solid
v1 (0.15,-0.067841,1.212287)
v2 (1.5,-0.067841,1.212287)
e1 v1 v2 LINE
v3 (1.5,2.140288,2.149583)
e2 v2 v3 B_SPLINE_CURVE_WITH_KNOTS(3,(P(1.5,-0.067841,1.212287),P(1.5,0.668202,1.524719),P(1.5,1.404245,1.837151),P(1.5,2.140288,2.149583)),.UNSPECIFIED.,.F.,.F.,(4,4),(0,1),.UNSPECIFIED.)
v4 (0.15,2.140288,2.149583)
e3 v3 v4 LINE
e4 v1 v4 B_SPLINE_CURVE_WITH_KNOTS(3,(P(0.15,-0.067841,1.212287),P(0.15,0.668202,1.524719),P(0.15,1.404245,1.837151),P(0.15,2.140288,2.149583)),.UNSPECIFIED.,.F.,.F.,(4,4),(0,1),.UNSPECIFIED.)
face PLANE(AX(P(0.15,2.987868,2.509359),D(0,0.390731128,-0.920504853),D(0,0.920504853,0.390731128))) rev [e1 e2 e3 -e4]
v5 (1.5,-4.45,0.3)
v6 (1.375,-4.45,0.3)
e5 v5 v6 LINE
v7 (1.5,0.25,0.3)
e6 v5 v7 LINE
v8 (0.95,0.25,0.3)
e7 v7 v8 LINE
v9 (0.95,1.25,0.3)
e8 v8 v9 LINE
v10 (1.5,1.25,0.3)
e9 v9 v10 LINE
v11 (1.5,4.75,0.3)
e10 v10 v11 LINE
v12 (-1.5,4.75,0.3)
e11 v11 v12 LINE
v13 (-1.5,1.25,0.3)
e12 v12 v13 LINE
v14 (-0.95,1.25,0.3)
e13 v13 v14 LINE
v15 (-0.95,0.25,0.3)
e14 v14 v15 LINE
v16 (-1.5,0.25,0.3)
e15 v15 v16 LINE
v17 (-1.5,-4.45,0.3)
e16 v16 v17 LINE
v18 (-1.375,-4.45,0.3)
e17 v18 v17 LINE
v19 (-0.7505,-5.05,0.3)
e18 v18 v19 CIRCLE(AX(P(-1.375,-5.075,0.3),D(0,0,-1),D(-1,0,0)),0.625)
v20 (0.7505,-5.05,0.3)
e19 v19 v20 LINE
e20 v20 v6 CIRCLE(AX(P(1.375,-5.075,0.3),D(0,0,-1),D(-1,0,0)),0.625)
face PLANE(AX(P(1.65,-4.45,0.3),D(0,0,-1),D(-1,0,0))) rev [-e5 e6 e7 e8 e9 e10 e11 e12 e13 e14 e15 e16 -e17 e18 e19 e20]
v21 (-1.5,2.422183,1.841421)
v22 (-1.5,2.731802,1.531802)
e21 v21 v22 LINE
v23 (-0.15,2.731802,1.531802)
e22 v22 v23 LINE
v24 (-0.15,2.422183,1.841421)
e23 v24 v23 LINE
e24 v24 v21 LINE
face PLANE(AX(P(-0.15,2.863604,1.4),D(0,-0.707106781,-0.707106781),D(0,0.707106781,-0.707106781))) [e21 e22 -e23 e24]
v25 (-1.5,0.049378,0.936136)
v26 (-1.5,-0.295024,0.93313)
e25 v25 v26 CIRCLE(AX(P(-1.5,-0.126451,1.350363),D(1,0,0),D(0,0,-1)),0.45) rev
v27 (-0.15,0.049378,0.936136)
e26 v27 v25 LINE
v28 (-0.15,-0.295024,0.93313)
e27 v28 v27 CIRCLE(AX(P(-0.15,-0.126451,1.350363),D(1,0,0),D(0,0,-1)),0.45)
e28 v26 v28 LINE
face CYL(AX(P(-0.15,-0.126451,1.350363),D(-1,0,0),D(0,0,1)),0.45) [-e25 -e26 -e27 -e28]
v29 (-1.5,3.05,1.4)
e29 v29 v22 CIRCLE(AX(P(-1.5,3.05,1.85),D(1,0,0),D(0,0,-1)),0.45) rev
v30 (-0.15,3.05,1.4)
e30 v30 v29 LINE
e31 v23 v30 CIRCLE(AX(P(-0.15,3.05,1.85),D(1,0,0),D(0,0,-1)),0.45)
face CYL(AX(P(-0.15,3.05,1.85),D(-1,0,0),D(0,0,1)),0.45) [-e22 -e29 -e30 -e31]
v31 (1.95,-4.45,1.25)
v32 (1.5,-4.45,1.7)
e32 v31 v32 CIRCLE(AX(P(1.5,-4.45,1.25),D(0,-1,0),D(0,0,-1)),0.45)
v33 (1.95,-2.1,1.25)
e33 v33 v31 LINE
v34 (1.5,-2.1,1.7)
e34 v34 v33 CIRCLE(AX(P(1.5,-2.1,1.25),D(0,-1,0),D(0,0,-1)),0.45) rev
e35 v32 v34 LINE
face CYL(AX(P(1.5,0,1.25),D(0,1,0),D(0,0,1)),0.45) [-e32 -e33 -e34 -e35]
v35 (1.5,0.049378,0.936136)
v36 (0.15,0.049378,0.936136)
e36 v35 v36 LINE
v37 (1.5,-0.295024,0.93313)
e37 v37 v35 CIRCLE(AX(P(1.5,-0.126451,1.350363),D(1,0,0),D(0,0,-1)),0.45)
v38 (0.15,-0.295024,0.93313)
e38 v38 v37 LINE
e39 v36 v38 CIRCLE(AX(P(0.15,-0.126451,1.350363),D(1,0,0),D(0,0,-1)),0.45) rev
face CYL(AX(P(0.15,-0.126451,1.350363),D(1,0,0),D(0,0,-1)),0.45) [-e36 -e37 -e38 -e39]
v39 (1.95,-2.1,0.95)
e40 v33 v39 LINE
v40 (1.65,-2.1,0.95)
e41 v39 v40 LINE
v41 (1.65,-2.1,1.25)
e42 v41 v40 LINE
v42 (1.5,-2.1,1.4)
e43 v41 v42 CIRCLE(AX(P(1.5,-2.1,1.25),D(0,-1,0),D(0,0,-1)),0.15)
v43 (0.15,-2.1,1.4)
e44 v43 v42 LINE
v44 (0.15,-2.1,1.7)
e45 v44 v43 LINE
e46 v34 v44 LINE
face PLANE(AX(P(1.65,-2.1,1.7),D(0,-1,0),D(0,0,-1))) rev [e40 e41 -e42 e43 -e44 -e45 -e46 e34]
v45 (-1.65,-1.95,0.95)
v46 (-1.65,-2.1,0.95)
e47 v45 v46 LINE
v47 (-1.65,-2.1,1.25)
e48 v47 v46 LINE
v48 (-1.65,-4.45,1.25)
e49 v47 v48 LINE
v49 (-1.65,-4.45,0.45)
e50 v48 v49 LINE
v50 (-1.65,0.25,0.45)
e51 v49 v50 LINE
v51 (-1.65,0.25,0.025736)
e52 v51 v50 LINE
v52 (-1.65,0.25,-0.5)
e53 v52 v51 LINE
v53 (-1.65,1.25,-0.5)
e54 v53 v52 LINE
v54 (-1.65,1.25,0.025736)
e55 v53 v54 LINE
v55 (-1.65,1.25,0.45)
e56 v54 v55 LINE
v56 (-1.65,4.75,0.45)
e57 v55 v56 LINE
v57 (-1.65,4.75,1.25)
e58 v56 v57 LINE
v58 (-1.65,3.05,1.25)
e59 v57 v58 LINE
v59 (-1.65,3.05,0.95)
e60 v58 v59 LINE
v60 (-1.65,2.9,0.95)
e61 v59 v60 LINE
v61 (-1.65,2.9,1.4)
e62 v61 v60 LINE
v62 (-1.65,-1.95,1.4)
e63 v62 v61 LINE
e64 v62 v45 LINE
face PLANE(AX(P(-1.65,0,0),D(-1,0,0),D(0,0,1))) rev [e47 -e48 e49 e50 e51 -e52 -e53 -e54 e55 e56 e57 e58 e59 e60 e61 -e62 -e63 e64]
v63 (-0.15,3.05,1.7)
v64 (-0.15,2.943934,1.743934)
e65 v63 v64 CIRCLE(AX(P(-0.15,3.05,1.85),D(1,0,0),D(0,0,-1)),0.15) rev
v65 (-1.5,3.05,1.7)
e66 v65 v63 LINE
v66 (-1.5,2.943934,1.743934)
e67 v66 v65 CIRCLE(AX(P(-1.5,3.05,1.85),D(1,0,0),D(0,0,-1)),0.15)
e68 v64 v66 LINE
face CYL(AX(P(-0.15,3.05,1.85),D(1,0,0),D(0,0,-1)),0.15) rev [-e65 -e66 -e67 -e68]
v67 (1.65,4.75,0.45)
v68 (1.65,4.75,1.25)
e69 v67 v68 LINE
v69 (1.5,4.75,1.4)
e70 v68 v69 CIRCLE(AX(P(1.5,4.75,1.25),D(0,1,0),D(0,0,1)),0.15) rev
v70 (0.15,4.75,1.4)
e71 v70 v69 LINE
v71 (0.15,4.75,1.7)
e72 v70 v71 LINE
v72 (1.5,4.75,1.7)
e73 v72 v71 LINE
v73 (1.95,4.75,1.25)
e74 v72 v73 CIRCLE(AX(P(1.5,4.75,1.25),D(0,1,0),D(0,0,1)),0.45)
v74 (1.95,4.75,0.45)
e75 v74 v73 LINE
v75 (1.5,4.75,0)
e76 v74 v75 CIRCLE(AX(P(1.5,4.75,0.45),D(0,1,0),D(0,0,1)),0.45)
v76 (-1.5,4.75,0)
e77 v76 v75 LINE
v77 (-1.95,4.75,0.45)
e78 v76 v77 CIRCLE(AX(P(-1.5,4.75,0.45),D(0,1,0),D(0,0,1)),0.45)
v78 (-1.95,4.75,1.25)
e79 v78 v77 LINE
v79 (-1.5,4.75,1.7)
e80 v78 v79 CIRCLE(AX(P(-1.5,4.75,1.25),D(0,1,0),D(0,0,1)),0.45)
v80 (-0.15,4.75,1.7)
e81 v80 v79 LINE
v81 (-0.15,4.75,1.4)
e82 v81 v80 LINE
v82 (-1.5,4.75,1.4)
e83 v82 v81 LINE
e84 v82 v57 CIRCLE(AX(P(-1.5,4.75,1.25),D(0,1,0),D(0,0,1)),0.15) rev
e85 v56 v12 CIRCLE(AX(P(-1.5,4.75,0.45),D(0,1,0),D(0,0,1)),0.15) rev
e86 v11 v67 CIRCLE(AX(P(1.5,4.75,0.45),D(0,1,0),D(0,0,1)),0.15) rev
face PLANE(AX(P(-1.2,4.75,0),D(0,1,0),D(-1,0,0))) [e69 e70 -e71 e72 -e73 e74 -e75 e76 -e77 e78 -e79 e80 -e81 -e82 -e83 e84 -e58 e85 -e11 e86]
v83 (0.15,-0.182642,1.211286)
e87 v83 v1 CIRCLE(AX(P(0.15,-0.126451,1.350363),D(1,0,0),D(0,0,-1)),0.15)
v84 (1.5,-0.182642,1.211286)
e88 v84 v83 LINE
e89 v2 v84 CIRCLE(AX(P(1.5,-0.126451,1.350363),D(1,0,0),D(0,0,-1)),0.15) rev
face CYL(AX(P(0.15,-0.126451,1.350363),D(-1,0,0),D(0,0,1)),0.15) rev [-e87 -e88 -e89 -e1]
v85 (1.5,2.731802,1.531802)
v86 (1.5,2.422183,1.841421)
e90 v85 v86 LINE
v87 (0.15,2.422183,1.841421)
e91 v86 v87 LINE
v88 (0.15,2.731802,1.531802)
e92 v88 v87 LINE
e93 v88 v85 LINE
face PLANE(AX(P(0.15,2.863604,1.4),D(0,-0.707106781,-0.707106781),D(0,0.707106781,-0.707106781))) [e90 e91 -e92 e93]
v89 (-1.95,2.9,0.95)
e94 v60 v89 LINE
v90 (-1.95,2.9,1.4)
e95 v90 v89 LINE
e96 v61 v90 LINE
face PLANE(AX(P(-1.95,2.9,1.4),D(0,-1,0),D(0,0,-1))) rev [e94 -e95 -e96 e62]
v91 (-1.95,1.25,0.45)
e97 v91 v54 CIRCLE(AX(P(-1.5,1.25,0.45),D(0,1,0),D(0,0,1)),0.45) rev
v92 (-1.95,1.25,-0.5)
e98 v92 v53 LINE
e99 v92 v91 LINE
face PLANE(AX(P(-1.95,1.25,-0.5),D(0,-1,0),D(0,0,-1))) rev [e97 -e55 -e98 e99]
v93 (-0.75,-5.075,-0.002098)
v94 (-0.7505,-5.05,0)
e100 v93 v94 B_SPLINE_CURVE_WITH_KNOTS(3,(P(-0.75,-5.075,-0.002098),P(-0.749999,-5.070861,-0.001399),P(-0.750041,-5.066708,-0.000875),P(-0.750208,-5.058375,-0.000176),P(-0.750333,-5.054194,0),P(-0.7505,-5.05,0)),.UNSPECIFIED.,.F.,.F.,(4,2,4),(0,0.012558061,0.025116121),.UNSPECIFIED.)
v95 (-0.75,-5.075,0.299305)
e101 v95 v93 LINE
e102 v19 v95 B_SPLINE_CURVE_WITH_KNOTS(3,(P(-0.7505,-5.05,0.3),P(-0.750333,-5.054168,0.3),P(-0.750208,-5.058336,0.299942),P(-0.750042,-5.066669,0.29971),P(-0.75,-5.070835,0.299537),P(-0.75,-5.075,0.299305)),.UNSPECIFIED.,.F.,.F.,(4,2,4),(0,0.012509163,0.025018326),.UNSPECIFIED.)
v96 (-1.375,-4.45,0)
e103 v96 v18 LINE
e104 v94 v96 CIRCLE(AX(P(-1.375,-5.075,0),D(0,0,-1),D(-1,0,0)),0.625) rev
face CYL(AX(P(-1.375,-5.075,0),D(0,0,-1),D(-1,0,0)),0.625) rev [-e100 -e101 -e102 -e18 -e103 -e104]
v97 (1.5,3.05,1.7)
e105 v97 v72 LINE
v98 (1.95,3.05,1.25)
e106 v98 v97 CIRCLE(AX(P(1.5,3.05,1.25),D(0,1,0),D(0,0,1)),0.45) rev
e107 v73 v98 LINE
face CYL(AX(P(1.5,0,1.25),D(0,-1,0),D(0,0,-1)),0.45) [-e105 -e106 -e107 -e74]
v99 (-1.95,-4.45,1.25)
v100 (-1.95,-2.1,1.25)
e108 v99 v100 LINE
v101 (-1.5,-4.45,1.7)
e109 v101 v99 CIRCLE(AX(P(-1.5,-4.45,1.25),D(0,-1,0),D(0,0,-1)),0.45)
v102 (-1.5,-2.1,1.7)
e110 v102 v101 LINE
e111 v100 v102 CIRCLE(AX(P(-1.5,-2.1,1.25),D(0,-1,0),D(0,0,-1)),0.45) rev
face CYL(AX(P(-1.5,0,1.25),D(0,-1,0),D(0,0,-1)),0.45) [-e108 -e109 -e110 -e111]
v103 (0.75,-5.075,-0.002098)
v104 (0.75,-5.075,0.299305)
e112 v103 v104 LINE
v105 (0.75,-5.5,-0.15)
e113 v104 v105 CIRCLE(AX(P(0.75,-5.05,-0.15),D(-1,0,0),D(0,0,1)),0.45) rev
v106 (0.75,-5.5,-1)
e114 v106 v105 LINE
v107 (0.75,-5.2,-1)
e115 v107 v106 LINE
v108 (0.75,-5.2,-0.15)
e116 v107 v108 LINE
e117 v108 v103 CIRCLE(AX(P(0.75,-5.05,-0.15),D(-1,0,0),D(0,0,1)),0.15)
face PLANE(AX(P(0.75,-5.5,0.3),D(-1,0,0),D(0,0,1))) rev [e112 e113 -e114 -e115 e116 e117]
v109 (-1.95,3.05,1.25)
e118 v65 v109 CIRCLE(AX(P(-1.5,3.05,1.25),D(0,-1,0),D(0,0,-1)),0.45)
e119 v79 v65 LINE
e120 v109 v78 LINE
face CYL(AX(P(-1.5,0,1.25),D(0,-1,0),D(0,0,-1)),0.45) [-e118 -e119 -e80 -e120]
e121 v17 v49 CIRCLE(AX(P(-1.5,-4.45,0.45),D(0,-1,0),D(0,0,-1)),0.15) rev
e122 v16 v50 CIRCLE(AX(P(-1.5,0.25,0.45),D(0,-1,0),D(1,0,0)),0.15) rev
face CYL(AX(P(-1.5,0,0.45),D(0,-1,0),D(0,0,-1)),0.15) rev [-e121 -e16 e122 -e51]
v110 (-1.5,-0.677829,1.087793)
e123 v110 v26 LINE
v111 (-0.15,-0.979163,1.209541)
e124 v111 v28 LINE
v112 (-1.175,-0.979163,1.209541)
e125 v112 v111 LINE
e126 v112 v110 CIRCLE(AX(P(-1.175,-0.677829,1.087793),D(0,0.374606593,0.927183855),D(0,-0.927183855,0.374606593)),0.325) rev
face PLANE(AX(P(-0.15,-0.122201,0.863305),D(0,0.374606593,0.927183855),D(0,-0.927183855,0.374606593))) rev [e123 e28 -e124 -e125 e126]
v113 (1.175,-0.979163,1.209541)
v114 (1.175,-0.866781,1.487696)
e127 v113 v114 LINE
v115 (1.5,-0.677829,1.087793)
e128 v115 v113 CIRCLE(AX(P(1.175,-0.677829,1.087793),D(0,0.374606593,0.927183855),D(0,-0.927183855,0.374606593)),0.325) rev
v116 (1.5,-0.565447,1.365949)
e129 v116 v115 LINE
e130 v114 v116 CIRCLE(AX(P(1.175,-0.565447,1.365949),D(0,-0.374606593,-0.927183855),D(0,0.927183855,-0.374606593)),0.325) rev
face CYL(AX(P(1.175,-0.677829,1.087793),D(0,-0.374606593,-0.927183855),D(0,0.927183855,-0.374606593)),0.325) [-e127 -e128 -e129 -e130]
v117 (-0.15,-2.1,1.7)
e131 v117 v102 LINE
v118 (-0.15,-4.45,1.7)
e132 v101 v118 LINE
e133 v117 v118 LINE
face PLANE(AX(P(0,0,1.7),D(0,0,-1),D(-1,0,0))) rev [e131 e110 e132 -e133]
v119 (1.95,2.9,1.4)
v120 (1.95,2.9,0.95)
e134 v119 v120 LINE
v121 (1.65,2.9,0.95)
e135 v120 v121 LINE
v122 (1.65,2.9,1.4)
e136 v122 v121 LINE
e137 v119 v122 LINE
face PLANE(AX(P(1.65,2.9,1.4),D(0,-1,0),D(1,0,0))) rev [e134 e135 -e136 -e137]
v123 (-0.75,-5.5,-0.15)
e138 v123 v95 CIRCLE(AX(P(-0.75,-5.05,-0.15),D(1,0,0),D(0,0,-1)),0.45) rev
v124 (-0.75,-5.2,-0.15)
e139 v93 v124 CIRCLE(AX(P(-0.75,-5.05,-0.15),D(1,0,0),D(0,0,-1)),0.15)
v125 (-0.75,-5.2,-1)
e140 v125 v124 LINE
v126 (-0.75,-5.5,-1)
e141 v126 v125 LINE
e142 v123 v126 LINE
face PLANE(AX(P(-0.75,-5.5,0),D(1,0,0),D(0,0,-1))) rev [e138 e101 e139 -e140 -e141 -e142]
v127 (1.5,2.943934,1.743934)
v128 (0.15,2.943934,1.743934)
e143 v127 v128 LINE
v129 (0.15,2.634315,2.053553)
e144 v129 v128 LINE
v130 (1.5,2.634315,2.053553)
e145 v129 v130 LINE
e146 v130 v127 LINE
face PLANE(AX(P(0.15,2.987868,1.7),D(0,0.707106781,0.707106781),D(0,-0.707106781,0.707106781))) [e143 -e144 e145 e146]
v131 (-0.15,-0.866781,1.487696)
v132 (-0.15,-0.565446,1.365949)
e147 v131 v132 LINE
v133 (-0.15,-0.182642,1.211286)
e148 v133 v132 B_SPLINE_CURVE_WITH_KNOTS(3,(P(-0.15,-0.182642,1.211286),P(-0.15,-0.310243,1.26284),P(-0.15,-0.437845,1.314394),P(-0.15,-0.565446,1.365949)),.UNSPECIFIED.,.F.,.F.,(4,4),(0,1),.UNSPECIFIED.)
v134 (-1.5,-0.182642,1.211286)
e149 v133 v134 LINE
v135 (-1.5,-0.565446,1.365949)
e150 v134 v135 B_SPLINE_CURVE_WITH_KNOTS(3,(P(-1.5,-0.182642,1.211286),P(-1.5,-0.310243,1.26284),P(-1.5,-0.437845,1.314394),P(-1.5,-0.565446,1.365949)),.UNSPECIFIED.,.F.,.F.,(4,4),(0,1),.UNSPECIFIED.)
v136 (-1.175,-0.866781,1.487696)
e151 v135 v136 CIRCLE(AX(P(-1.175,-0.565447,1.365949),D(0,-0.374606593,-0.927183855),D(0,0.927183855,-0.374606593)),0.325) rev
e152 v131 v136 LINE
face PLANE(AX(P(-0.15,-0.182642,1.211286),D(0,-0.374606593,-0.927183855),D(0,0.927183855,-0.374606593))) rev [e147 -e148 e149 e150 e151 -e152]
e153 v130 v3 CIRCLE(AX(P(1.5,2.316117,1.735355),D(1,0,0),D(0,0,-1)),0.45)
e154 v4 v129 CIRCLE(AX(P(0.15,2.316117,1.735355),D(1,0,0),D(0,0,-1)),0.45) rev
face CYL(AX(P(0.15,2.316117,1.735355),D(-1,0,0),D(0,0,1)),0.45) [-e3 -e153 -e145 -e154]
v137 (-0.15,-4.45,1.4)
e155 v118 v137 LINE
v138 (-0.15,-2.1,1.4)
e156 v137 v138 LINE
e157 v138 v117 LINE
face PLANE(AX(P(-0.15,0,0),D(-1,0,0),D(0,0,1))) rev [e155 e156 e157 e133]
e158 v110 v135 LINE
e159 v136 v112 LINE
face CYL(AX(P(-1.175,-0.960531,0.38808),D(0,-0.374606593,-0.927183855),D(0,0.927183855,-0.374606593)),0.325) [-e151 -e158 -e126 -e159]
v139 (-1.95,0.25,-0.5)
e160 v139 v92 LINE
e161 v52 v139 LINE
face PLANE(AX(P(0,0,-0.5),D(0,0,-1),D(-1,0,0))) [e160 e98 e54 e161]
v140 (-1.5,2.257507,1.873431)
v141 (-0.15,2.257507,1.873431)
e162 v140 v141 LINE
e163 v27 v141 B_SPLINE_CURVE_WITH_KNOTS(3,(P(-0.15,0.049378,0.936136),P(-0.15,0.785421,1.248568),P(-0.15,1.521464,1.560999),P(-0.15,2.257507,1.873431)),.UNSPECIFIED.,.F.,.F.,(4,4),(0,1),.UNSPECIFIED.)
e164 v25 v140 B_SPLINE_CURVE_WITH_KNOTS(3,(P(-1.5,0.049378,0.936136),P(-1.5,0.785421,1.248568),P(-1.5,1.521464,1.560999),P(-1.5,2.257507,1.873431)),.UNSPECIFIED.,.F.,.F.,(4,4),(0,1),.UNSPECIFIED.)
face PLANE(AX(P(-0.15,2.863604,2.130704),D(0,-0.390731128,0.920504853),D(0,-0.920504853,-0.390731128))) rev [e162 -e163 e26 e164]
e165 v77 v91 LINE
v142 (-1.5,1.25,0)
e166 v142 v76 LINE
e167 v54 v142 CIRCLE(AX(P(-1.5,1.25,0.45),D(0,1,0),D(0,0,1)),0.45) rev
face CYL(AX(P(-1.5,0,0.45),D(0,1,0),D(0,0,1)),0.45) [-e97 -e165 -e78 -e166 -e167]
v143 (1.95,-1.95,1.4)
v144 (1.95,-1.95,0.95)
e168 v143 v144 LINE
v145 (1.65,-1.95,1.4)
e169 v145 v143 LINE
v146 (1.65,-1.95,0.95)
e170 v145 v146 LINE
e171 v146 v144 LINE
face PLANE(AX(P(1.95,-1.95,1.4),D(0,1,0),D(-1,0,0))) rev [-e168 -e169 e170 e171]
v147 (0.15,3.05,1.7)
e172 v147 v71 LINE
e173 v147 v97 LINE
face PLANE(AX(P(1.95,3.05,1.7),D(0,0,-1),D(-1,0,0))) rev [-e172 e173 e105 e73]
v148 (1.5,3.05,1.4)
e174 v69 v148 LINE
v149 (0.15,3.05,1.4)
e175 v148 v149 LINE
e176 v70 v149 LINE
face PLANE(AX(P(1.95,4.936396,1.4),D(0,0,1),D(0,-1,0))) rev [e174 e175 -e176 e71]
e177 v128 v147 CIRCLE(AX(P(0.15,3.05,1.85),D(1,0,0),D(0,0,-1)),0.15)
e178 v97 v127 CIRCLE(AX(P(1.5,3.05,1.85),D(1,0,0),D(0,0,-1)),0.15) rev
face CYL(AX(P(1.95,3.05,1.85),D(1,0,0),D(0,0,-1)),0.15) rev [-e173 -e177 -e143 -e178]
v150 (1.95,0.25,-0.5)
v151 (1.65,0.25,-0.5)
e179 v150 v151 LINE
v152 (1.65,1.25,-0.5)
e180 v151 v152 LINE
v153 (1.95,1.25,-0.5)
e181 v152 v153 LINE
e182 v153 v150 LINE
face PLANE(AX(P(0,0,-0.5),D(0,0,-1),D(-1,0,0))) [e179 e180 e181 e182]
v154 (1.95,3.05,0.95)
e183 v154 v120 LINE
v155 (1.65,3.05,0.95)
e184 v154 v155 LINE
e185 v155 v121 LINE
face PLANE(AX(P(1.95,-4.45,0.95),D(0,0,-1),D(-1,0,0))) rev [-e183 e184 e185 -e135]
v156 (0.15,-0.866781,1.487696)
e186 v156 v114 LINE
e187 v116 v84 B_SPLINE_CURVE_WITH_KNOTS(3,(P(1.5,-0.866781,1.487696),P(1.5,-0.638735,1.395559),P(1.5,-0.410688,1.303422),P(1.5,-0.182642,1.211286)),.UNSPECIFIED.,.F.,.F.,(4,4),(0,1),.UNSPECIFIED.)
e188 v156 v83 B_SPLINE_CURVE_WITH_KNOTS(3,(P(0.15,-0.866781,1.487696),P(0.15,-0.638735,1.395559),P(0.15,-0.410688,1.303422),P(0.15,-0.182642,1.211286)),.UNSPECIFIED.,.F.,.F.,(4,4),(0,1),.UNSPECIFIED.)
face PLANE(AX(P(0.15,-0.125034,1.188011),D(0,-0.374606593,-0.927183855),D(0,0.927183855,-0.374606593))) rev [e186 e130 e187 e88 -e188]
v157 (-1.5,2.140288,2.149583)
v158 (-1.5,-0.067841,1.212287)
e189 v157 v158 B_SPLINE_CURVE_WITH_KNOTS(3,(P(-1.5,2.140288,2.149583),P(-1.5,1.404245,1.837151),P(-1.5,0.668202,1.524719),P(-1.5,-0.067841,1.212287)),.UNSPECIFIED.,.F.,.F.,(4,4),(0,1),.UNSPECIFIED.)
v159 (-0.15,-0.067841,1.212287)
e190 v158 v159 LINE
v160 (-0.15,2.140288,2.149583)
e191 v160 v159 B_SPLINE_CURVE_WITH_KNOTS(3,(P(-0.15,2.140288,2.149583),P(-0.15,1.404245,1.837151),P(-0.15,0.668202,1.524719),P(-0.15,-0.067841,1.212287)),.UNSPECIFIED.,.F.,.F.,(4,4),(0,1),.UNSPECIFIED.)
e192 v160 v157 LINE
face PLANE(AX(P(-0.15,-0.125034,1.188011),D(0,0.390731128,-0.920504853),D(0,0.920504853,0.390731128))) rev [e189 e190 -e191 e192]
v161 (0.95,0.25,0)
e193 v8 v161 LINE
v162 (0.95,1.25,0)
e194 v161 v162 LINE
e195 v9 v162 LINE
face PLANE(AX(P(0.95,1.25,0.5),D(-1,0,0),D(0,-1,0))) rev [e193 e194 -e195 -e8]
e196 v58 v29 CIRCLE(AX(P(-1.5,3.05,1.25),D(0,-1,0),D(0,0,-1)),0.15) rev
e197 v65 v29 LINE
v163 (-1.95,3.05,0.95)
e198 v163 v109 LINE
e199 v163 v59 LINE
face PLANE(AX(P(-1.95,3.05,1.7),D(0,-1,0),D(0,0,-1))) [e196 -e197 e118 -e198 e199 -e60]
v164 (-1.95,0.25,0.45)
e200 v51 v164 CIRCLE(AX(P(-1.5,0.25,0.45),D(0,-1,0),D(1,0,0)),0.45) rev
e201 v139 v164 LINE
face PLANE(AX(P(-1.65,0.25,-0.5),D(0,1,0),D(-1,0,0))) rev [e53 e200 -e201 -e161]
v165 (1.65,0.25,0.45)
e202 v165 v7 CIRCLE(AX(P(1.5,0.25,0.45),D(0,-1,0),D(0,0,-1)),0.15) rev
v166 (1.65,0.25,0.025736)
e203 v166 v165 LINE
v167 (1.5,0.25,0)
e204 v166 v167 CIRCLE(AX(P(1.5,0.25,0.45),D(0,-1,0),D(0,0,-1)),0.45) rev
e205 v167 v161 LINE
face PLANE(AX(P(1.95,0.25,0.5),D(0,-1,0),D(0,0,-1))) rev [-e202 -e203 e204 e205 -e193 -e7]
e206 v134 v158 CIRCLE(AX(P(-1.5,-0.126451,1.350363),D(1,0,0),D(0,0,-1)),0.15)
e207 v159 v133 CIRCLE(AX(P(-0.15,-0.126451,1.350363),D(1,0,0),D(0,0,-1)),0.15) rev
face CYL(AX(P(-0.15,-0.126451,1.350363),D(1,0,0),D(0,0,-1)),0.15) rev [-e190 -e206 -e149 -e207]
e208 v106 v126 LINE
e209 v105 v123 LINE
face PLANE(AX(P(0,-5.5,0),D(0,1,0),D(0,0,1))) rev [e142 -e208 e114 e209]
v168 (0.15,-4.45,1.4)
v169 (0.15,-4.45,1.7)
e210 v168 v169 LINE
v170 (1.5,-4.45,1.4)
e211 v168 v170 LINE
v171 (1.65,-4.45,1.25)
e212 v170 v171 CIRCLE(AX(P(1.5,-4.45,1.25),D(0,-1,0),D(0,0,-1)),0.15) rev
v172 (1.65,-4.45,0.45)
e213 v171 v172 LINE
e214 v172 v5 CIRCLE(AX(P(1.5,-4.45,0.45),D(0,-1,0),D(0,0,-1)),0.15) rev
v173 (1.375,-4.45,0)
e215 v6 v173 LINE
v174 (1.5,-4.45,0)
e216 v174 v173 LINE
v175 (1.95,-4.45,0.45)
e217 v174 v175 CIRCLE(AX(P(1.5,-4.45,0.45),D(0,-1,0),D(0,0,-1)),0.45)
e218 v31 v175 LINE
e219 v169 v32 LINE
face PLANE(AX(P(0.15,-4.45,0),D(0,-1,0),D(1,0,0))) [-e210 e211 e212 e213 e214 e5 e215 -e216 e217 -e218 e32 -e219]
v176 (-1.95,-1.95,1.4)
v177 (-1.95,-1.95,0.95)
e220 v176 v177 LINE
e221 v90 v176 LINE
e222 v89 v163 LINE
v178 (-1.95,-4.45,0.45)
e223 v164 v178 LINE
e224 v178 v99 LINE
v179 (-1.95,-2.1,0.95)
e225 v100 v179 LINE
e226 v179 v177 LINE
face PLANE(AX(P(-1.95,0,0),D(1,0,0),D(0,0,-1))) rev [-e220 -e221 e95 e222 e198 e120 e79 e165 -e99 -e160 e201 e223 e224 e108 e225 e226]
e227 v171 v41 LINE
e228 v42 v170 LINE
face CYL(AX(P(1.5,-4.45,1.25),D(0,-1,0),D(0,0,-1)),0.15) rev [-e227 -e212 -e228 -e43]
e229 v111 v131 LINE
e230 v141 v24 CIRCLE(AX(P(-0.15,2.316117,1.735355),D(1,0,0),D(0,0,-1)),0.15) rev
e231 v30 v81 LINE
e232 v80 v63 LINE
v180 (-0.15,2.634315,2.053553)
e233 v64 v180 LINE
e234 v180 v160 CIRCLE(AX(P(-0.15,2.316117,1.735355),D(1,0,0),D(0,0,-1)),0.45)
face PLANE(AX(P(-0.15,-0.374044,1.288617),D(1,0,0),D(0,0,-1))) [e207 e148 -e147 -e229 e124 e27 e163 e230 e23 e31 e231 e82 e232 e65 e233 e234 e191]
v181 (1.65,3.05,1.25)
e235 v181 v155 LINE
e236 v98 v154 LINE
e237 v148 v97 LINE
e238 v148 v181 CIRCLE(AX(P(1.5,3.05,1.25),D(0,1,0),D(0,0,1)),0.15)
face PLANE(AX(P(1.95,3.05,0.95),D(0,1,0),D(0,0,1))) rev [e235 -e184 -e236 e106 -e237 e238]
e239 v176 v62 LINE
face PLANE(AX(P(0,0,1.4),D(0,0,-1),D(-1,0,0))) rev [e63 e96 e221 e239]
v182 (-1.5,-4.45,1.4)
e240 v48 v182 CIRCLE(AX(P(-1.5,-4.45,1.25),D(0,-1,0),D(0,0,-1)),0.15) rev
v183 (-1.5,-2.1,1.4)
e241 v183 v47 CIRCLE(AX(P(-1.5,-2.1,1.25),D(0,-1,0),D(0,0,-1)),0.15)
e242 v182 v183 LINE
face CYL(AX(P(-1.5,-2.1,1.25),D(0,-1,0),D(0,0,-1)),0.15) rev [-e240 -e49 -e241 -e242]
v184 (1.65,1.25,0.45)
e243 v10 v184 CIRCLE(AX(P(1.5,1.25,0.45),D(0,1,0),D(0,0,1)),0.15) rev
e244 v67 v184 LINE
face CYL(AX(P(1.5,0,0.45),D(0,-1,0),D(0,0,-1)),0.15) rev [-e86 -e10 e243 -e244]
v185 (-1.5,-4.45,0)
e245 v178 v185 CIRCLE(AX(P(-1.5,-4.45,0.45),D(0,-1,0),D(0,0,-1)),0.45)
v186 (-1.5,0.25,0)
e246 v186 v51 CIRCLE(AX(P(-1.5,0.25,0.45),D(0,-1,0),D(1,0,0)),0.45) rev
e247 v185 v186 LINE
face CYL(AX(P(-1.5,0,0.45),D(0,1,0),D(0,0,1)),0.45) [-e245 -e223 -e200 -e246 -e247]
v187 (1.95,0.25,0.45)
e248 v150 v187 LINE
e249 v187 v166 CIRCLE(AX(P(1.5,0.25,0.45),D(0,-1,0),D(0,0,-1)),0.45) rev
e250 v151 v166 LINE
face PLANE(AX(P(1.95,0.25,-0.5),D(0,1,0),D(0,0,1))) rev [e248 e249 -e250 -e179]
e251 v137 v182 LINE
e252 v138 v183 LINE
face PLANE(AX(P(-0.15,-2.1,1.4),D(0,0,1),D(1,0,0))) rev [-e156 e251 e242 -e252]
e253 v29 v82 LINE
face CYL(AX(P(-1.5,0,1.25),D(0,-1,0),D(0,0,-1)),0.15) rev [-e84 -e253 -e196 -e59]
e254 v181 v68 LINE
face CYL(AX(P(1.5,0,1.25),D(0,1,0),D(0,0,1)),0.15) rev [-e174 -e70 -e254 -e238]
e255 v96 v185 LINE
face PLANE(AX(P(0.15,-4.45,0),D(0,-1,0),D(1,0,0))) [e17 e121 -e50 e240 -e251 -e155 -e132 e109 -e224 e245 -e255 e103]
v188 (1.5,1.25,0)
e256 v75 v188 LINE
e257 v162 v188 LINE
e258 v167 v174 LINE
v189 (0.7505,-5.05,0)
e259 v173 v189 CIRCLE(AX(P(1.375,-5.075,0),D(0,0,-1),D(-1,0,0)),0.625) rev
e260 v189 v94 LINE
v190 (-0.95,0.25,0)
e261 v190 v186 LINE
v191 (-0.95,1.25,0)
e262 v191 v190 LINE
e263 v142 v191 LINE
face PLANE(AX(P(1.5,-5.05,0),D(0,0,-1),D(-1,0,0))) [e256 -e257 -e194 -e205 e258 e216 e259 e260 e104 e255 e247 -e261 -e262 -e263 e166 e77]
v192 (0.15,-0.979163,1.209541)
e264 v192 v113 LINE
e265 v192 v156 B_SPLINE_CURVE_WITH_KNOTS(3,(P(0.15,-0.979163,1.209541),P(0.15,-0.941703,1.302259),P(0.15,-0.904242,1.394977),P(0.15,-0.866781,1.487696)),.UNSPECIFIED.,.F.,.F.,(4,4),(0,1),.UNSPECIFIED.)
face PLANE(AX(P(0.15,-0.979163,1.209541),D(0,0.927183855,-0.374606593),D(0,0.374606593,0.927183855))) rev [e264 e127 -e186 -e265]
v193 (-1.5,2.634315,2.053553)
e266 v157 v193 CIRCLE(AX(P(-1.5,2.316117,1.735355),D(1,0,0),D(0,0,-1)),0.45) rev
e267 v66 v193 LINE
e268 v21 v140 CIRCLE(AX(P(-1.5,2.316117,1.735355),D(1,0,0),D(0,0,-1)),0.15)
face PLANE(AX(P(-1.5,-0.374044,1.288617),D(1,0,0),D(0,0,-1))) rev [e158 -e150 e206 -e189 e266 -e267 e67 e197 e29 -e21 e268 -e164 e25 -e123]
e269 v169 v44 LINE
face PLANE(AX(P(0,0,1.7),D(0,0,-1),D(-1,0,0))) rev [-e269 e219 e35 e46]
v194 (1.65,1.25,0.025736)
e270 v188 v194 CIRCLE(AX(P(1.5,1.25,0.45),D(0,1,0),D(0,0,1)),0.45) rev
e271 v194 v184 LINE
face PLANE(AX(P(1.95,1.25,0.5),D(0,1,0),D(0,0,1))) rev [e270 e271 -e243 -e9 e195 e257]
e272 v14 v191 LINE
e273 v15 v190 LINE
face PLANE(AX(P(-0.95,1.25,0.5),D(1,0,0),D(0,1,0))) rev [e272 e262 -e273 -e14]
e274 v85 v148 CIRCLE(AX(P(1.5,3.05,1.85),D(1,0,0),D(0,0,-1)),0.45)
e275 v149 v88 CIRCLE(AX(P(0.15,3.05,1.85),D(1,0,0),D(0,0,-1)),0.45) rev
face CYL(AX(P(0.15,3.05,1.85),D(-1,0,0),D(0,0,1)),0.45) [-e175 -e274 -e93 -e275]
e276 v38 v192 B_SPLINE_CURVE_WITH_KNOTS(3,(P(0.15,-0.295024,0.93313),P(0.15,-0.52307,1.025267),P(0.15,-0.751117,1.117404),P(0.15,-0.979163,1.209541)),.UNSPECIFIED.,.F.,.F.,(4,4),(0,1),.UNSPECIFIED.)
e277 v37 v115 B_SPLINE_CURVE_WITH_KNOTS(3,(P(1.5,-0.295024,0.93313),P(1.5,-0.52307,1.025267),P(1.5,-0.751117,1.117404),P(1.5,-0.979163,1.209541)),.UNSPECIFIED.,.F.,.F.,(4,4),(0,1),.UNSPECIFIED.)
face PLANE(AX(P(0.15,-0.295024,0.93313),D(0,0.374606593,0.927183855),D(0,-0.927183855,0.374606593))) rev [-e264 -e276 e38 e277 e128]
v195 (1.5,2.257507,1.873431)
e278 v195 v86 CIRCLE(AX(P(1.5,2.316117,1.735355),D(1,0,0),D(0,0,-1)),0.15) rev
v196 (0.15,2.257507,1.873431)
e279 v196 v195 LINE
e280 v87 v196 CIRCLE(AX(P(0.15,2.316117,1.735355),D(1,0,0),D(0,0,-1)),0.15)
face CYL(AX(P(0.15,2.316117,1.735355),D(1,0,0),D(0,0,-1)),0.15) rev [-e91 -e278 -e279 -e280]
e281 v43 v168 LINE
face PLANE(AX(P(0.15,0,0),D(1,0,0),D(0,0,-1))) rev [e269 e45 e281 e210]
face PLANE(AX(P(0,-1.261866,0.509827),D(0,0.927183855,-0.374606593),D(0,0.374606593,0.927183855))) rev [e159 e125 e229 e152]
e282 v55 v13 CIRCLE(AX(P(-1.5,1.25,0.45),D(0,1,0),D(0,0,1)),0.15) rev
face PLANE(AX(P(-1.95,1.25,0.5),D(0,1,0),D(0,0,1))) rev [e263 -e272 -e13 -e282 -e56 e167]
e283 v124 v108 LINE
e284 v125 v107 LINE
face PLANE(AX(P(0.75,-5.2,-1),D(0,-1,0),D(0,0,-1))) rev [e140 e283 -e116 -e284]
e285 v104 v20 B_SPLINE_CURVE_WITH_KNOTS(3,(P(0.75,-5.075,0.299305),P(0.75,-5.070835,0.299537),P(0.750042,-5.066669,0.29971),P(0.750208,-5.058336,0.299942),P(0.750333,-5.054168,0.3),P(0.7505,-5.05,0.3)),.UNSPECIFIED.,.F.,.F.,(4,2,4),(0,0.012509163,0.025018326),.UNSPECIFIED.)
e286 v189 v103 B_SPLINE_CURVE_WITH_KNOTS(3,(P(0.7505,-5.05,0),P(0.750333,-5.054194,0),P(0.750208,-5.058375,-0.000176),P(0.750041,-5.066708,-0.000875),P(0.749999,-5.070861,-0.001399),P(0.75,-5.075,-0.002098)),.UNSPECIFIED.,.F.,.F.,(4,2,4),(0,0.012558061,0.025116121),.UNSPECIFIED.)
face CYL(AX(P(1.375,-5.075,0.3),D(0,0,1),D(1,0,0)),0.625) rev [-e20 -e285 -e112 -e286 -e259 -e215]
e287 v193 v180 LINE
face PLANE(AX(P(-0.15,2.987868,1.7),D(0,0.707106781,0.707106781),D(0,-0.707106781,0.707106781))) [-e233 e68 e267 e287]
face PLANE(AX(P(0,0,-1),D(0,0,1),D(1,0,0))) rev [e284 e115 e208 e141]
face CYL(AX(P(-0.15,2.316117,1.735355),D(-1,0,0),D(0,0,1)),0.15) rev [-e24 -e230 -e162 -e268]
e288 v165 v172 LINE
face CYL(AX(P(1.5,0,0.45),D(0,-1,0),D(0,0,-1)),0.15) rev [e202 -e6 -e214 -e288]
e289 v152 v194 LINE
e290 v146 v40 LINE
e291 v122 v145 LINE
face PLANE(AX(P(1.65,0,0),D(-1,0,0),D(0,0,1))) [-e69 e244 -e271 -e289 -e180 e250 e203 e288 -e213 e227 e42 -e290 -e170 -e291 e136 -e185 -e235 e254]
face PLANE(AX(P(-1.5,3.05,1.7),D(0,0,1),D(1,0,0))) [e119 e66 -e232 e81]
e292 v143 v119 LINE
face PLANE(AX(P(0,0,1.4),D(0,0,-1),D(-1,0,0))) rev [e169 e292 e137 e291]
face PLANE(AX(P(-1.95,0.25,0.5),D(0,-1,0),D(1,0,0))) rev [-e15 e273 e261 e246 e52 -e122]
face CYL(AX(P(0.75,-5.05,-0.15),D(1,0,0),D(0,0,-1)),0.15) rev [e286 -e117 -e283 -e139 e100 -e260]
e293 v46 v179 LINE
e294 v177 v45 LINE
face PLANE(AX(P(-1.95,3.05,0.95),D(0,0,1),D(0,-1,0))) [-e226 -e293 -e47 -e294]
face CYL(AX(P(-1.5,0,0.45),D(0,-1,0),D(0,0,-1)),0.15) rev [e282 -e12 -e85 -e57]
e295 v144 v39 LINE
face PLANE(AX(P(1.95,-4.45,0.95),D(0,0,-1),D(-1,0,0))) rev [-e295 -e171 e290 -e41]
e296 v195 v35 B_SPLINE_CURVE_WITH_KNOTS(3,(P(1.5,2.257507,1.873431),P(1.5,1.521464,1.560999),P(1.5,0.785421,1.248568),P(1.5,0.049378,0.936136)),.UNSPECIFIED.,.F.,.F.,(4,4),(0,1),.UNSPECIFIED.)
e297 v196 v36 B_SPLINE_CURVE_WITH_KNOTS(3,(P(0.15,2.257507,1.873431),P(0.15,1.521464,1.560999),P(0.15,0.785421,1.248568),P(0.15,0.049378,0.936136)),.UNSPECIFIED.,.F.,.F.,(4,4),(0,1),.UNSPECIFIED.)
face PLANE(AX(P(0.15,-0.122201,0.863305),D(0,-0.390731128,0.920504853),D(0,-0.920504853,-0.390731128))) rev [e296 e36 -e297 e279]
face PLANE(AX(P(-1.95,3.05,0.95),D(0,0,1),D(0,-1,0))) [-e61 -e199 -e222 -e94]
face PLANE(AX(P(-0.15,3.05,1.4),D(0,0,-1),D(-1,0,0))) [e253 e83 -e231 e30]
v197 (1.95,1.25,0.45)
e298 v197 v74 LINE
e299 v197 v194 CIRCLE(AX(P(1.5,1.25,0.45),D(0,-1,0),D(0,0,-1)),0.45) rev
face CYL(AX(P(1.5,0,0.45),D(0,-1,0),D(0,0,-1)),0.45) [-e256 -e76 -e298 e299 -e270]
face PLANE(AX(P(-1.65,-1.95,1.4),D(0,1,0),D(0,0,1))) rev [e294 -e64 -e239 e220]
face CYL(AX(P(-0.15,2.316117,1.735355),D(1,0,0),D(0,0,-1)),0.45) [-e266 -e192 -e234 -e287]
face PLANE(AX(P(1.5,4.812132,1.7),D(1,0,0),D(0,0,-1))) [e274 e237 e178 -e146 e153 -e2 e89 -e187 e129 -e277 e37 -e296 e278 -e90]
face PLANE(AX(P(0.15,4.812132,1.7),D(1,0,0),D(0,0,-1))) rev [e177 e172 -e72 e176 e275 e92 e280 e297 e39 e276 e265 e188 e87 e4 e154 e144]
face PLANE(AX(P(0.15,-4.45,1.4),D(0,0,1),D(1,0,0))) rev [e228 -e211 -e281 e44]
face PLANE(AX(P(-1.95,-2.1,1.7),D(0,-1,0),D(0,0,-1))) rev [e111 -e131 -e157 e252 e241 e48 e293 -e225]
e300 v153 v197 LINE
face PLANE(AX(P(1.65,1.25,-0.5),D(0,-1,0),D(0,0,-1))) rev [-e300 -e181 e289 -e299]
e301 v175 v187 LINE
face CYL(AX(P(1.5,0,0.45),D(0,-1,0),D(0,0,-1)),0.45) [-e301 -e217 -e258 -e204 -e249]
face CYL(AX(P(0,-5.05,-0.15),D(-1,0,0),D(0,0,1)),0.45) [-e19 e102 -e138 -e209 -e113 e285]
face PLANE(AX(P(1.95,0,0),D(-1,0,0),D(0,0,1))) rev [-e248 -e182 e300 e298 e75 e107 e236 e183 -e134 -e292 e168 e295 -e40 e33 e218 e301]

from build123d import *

# Parameters (mm, degrees)
BOSS_EXTRUDE1_DEPTH   = 1.35
BOSS_EXTRUDE1_START   = -0.15
BOSS_EXTRUDE1_2_DEPTH = 0.15
SKETCH2_W             = 0.3000000000000001
SKETCH2_H             = 9.200000000000003
BOSS_EXTRUDE2_DEPTH   = 3.1499999999999995
BOSS_EXTRUDE3_DEPTH   = 0.29999999999999993
BOSS_EXTRUDE4_DEPTH   = 0.30000000000000016
CUT_EXTRUDE1_DEPTH    = 0.15000000000000127
BOSS_EXTRUDE5_DEPTH   = 0.15000000000000127
BOSS_EXTRUDE6_DEPTH   = 1.3500000000000003
CUT_EXTRUDE2_DEPTH    = 0.3000000000000021
CUT_EXTRUDE3_DEPTH    = 0.29999999999999927
CUT_EXTRUDE4_DEPTH    = 0.15000000000000385
CUT_EXTRUDE5_DEPTH    = 0.1500000000000002
BOSS_EXTRUDE7_DEPTH   = 0.32500023179600646
SKETCH13_W            = 2.4
SKETCH13_H            = 0.30000000000000016
BOSS_EXTRUDE8_DEPTH   = 0.7500000000000016
BOSS_EXTRUDE9_DEPTH   = 0.3000000000000004
SKETCH15_W            = 0.30000000000000016
SKETCH15_H            = 0.6000000000000005
BOSS_EXTRUDE10_DEPTH  = 0.3000000000000004
BOSS_EXTRUDE11_DEPTH  = 1
SKETCH17_W            = 0.30000000000000004
SKETCH17_H            = 2.350000000000001
BOSS_EXTRUDE12_DEPTH  = 0.7499999999999998
SKETCH18_W            = 0.30000000000000004
SKETCH18_H            = 2.350000000000001
BOSS_EXTRUDE13_DEPTH  = 1.5000000000000007
BOSS_EXTRUDE14_DEPTH  = 0.4499999999999999
BOSS_EXTRUDE15_DEPTH  = 1.0499999999999998
SKETCH21_W            = 1.5
SKETCH21_H            = 0.2999999999999998
BOSS_EXTRUDE16_DEPTH  = 1
BOSS_EXTRUDE17_DEPTH  = 0.7499999999999999
SKETCH23_W            = 0.30000000000000004
SKETCH23_H            = 2.350000000000001
BOSS_EXTRUDE18_DEPTH  = 1.5000000000000004
SKETCH24_W            = 0.30000000000000004
SKETCH24_H            = 4.8500000000000005
BOSS_EXTRUDE19_DEPTH  = 0.4499999999999999
DRAFT1_START          = -1.5
DRAFT1_DEPTH          = 1.35
DRAFT2_START          = -1.5
DRAFT2_DEPTH          = 1.35
DRAFT3_ANGLE          = 45.00000000000445
DRAFT4_ANGLE          = 44.99999999999104
FILLET1_R             = 0.15000000000000022
FILLET2_R             = 0.3250000000000042
FILLET3_R             = 0.45
FILLET4_DEPTH         = 0.3
FILLET4_START         = 2.200609665
FILLET4_2_DEPTH       = 0.3
CUT_EXTRUDE6_DEPTH    = 10
CUT_EXTRUDE7_DEPTH    = 0.5
BOSS_EXTRUDE20_DEPTH  = 1


with BuildPart() as part:
    # Boss-Extrude1: read off the stored shape, not the designer's step
    # Boss-Extrude1 outline → Boss-Extrude1 (new body)
    with BuildSketch(Plane(origin=(-1.4999999999999991, 0, 0), x_dir=(0, 0, -1), z_dir=(1, 0, 0))):
        Polygon((-3.114213562, 4.812132034), (-1.7, 4.812132034), (-1.7, 2.987867966), (-2.509359079, 2.987867966), (-1.188010503, -0.125034203), (-1.365948548, -0.565446319), (-1.087793392, -0.677828297), (-0.863305207, -0.122200542), (-2.130703998, 2.863603897), (-1.4, 2.863603897), (-1.4, 4.936396103), (-2.989949494, 4.936396103), align=None)
    extrude(amount=BOSS_EXTRUDE1_DEPTH)

    # Boss-Extrude1 2 outline → Boss-Extrude1 2 (add)
    with BuildSketch(Plane(origin=(-1.4999999999999991, 0, 0), x_dir=(0, 0, -1), z_dir=(1, 0, 0)).offset(BOSS_EXTRUDE1_START)):
        Polygon((-3.114213562, 4.812132034), (-1.7, 4.812132034), (-1.7, 3.05), (-0.95, 3.05), (-0.95, -4.45), (0, -4.45), (0, 4.75), (-1.4, 4.75), (-1.4, 4.936396103), (-2.989949494, 4.936396103), align=None)
    extrude(amount=BOSS_EXTRUDE1_2_DEPTH)

    # Sketch2 → Boss-Extrude2 (add)
    with BuildSketch(Plane(origin=(-1.4999999999999991, 0, 0), x_dir=(0, 0, -1), z_dir=(1, 0, 0))):
        with Locations((-0.15000000000000005, 0.1499999999999999)):
            Rectangle(SKETCH2_W, SKETCH2_H)
    extrude(amount=BOSS_EXTRUDE2_DEPTH)

    # Sketch3 → Boss-Extrude3 (add)
    with BuildSketch(Plane(origin=(1.6500000000000004, 0, 0), x_dir=(0, 0, -1), z_dir=(1, 0, 0))):
        Polygon((-0.9500000000000003, -4.450000000000001), (-0.9500000000000003, 3.0500000000000007), (-1.7000000000000002, 3.0500000000000007), (-1.7000000000000002, 4.812132034356001), (-3.1142135623726666, 4.812132034356001), (-2.989949493660945, 4.936396103067781), (-1.4000000000000001, 4.936396103067781), (-1.4000000000000035, 4.750000000000001), (0, 4.750000000000001), (0, -4.450000000000001), align=None)
    extrude(amount=BOSS_EXTRUDE3_DEPTH)

    # Sketch4 → Boss-Extrude4 (add)
    with BuildSketch(Plane.ZY.offset(1.6500000000000001)):
        Polygon((0.9500000000000002, -4.450000000000001), (0, -4.450000000000001), (0, 4.749999999999999), (1.4000000000000037, 4.750000000000001), (1.4000000000000001, 4.936396103067801), (2.9899494936609243, 4.936396103067802), (3.1142135623726666, 4.812132034356001), (1.7000000000000002, 4.812132034356001), (1.7000000000000002, 3.0500000000000007), (0.9500000000000003, 3.0500000000000007), align=None)
    extrude(amount=BOSS_EXTRUDE4_DEPTH)

    # Sketch5 → Cut-Extrude1 (cut)
    with BuildSketch(Plane(origin=(-1.4999999999999991, 0, 0), x_dir=(0, 0, -1), z_dir=(1, 0, 0))):
        Polygon((-0.9500000000000003, 3.0500000000000007), (-0.9500000000000002, -4.450000000000001), (-0.30000000000000004, -4.450000000000001), (-0.30000000000000016, 4.750000000000001), (-1.4000000000000037, 4.750000000000001), (-1.4000000000000001, 3.0500000000000007), align=None)
    extrude(amount=-CUT_EXTRUDE1_DEPTH, mode=Mode.SUBTRACT)

    # Sketch6 → Boss-Extrude5 (add)
    with BuildSketch(Plane.ZY.offset(-1.6500000000000004)):
        Polygon((1.7000000000000002, 4.812132034356001), (1.7000000000000002, 3.0500000000000007), (1.4000000000000197, 3.0500000000000007), (1.4000000000000001, 4.936396103067882), (2.9899494936608453, 4.936396103067881), (3.1142135623726666, 4.812132034356001), align=None)
    extrude(amount=BOSS_EXTRUDE5_DEPTH)

    # Sketch7 → Boss-Extrude6 (add)
    with BuildSketch(Plane.ZY.offset(-1.4999999999999991)):
        with BuildLine():
            Line((1.7, 2.9878679656439875), (2.5093590788271998, 2.9878679656439675))
            Line((2.5093590788271998, 2.9878679656439675), (2.1495825231129353, 2.1402875156965857))
            add(Edge.make_bspline(
                [(1.2122874229840004, -0.06784136341720032), (1.52471912302698, 0.6682015962873946), (1.8371508230699576, 1.4042445559919898), (2.1495825231129353, 2.1402875156965857)],
                knots=[0, 0, 0, 0, 1, 1, 1, 1], degree=3))
            Line((1.2122874229840004, -0.06784136341720032), (1.188010503084729, -0.12503420259681308))
            Line((1.188010503084729, -0.12503420259681308), (1.2112855728167975, -0.18264202170300106))
            add(Edge.make_bspline(
                [(1.4876957778174003, -0.8667812862502003), (1.3955590428172002, -0.638734864734467), (1.3034223078170002, -0.4106884432187335), (1.2112855728167975, -0.18264202170300106)],
                knots=[0, 0, 0, 0, 1, 1, 1, 1], degree=3))
            add(Edge.make_bspline(
                [(1.2095406214473998, -0.9791632642749003), (1.3022590069040665, -0.9417026049333337), (1.3949773923607334, -0.9042419455917671), (1.4876957778174003, -0.8667812862502003)],
                knots=[0, 0, 0, 0, 1, 1, 1, 1], degree=3))
            add(Edge.make_bspline(
                [(0.9331304164468003, -0.2950239997277002), (1.0252671514470002, -0.5230704212434336), (1.1174038864472, -0.7511168427591669), (1.2095406214473998, -0.9791632642749003)],
                knots=[0, 0, 0, 0, 1, 1, 1, 1], degree=3))
            Line((0.9331304164468003, -0.2950239997277002), (0.8633052072505193, -0.12220054240891351))
            Line((0.8633052072505193, -0.12220054240891351), (0.9361359669482366, 0.04937797512958447))
            add(Edge.make_bspline(
                [(1.8734310670777075, 2.2575068542431853), (1.5609993670345503, 1.5214638945386514), (1.2485676669913934, 0.7854209348341182), (0.9361359669482366, 0.04937797512958447)],
                knots=[0, 0, 0, 0, 1, 1, 1, 1], degree=3))
            Line((1.8734310670777075, 2.2575068542431853), (2.1307039978783813, 2.8636038969319726))
            Line((2.1307039978783813, 2.8636038969319726), (1.400000000000637, 2.863603896931973))
            Line((1.400000000000637, 2.863603896931973), (1.400000000000637, 4.936396103067612))
            Line((1.400000000000637, 4.936396103067612), (2.9899494936614825, 4.936396103067612))
            Line((2.9899494936614825, 4.936396103067612), (3.1142135623733327, 4.812132034355761))
            Line((3.1142135623733327, 4.812132034355761), (1.6999999999999997, 4.812132034355761))
            Line((1.6999999999999997, 4.812132034355761), (1.7, 2.9878679656439875))
        make_face()
    extrude(amount=BOSS_EXTRUDE6_DEPTH)

    # Sketch8 → Cut-Extrude2 (cut)
    with BuildSketch(Plane(origin=(1.9500000000000004, 0, 0), x_dir=(0, 0, -1), z_dir=(1, 0, 0))):
        Polygon((-1.7000000000000002, 4.750000000000001), (-1.4000000000000035, 4.750000000000001), (-1.4000000000000001, 4.936396103067781), (-2.989949493660945, 4.936396103067781), (-3.1142135623726666, 4.812132034356001), (-1.7000000000000002, 4.812132034356001), align=None)
    extrude(amount=-CUT_EXTRUDE2_DEPTH, mode=Mode.SUBTRACT)

    # Sketch9 → Cut-Extrude3 (cut)
    with BuildSketch(Plane.ZY.offset(1.9500000000000004)):
        Polygon((1.7000000000000035, 4.750000000000001), (1.7000000000000002, 4.812132034356001), (3.1142135623726666, 4.812132034356001), (2.9899494936609243, 4.936396103067802), (1.4000000000000001, 4.936396103067801), (1.4000000000000037, 4.750000000000001), align=None)
    extrude(amount=-CUT_EXTRUDE3_DEPTH, mode=Mode.SUBTRACT)

    # Sketch10 → Cut-Extrude4 (cut)
    with BuildSketch(Plane(origin=(1.6499999999999984, 0, 0), x_dir=(-7.23e-15, 0, -1), z_dir=(1, 0, -7.23e-15))):
        Polygon((-1.7000000000000153, 4.750000000000001), (-1.4000000000000155, 4.750000000000001), (-1.4000000000000121, 4.936396103067781), (-2.989949493660957, 4.936396103067781), (-3.1142135623726785, 4.812132034356001), (-1.700000000000012, 4.812132034356001), align=None)
    extrude(amount=-CUT_EXTRUDE4_DEPTH, mode=Mode.SUBTRACT)

    # Sketch11 → Cut-Extrude5 (cut)
    with BuildSketch(Plane.ZY.offset(1.650000000000001)):
        Polygon((1.700000000000013, 4.750000000000018), (1.7000000000000097, 4.8121320343560186), (3.114213562372676, 4.8121320343560186), (2.9899494936609337, 4.936396103067819), (1.4000000000000097, 4.9363961030678185), (1.4000000000000132, 4.750000000000018), align=None)
    extrude(amount=-CUT_EXTRUDE5_DEPTH, mode=Mode.SUBTRACT)

    # Sketch12 → Boss-Extrude7 (add)
    with BuildSketch(Plane(origin=(0, -0.9605309765461568, 0.3880797052513418), x_dir=(1, 0, 0), z_dir=(0, -0.9271838545669052, 0.37460659341562025))):
        Polygon((-0.15000000000000005, 1.0546655208211408), (-0.15000000000000005, 0.7546655208212015), (-1.5, 0.7546655208212013), (-1.5000000000000002, 1.0546655208211408), align=None)
    extrude(amount=BOSS_EXTRUDE7_DEPTH)

    # Sketch13 → Boss-Extrude8 (add)
    with BuildSketch(Plane(origin=(0, 4.750000000000001, 0), x_dir=(-1, 0, 0), z_dir=(0, 1, 0))):
        with Locations((0, 0.15000000000000008)):
            Rectangle(SKETCH13_W, SKETCH13_H)
    extrude(amount=BOSS_EXTRUDE8_DEPTH)

    # Sketch14 → Boss-Extrude9 (add)
    with BuildSketch(Plane.ZY.offset(1.2)):
        Polygon((0, 5.500000000000001), (0.30000000000000016, 5.500000000000001), (0.30000000000000016, 4.900000000000001), (0, 4.9), align=None)
    extrude(amount=BOSS_EXTRUDE9_DEPTH)

    # Sketch15 → Boss-Extrude10 (add)
    with BuildSketch(Plane(origin=(1.2, 0, 0), x_dir=(0, 0, -1), z_dir=(1, 0, 0))):
        with Locations((-0.15000000000000008, 5.200000000000001)):
            Rectangle(SKETCH15_W, SKETCH15_H)
    extrude(amount=BOSS_EXTRUDE10_DEPTH)

    # Sketch16 → Boss-Extrude11 (add)
    with BuildSketch(Plane(origin=(0, 0, 0), x_dir=(-1, 0, 0), z_dir=(0, 0, -1))):
        Polygon((1.4999999999999998, 5.200000000000001), (-1.4999999999999996, 5.200000000000001), (-1.5000000000000002, 5.500000000000001), (1.5000000000000002, 5.500000000000001), align=None)
    extrude(amount=BOSS_EXTRUDE11_DEPTH)

    # Sketch17 → Boss-Extrude12 (add)
    with BuildSketch(Plane.XY.offset(0.9500000000000003)):
        with Locations((1.8000000000000003, -3.2750000000000004)):
            Rectangle(SKETCH17_W, SKETCH17_H)
    extrude(amount=BOSS_EXTRUDE12_DEPTH)

    # Sketch18 → Boss-Extrude13 (add)
    with BuildSketch(Plane.ZY.offset(-1.6500000000000004)):
        with Locations((1.5500000000000003, -3.2750000000000004)):
            Rectangle(SKETCH18_W, SKETCH18_H)
    extrude(amount=BOSS_EXTRUDE13_DEPTH)

    # Sketch19 → Boss-Extrude14 (add)
    with BuildSketch(Plane.XY.offset(0.9500000000000003)):
        Polygon((1.6500000000000004, -1.9500000000000004), (1.6500000000000004, 2.9), (1.9500000000000004, 2.9000000000000004), (1.9500000000000004, -1.9500000000000002), align=None)
    extrude(amount=BOSS_EXTRUDE14_DEPTH)

    # Sketch20 → Boss-Extrude15 (add)
    with BuildSketch(Plane.XZ.offset(4.450000000000001)):
        Polygon((-0.7500000000000001, 0), (-0.7500000000000001, 0.30000000000000016), (0.7500000000000001, 0.30000000000000004), (0.7500000000000001, 0), align=None)
    extrude(amount=BOSS_EXTRUDE15_DEPTH)

    # Sketch21 → Boss-Extrude16 (add)
    with BuildSketch(Plane(origin=(0, 0, 0), x_dir=(-1, 0, 0), z_dir=(0, 0, -1))):
        with Locations((0, -5.350000000000001)):
            Rectangle(SKETCH21_W, SKETCH21_H)
    extrude(amount=BOSS_EXTRUDE16_DEPTH)

    # Sketch22 → Boss-Extrude17 (add)
    with BuildSketch(Plane.XY.offset(0.9500000000000003)):
        Polygon((-1.6500000000000001, -4.450000000000001), (-1.9500000000000004, -4.450000000000001), (-1.9500000000000004, -2.1), (-1.6500000000000004, -2.1), align=None)
    extrude(amount=BOSS_EXTRUDE17_DEPTH)

    # Sketch23 → Boss-Extrude18 (add)
    with BuildSketch(Plane(origin=(-1.6500000000000004, 0, 0), x_dir=(0, 0, -1), z_dir=(1, 0, 0))):
        with Locations((-1.5500000000000003, -3.2750000000000004)):
            Rectangle(SKETCH23_W, SKETCH23_H)
    extrude(amount=BOSS_EXTRUDE18_DEPTH)

    # Sketch24 → Boss-Extrude19 (add)
    with BuildSketch(Plane.XY.offset(0.9500000000000003)):
        with Locations((-1.8000000000000003, 0.475)):
            Rectangle(SKETCH24_W, SKETCH24_H)
    extrude(amount=BOSS_EXTRUDE19_DEPTH)

    # Draft1: read off the stored shape, not the designer's step
    # Draft1 outline → Draft1 (add)
    with BuildSketch(Plane.YZ.offset(DRAFT1_START)):
        Polygon((4.936396103, 2.989949494), (4.936396103, 1.4), (5.73137085, 2.194974747), align=None)
        Polygon((2.863603897, 2.130703998), (2.350640109, 1.912963788), (2.863603897, 1.4), align=None)
    extrude(amount=DRAFT1_DEPTH)

    # Draft2: read off the stored shape, not the designer's step
    # Draft2 outline → Draft2 (cut)
    with BuildSketch(Plane.YZ.offset(DRAFT2_START)):
        Polygon((4.812132034, 1.7), (5.519238816, 2.407106781), (4.812132034, 3.114213562), align=None)
        Polygon((2.419687279, 2.268180686), (2.987867966, 1.7), (2.987867966, 2.509359079), align=None)
    extrude(amount=DRAFT2_DEPTH, mode=Mode.SUBTRACT)

    # Draft3
    draft3_faces = [part.faces().sort_by_distance(p)[0] for p in [
        (0.824999999999999, 2.863603896931973, 1.7653519989395092),
        (0.8250000000000098, 4.936396103067781, 2.194974746830841),
    ]]
    draft(draft3_faces, Plane(origin=(1.9500000000000004, 4.936396103067781, 1.4000000000000001), x_dir=(0, -1, 1.745e-14), z_dir=(0, -1.745e-14, -1)), DRAFT3_ANGLE)

    # Draft4
    draft4_faces = [part.faces().sort_by_distance(p)[0] for p in [
        (0.8249999999999654, 4.812132034356001, 2.4071067811865423),
        (0.824999999999999, 2.9878679656439773, 2.1046795394136),
    ]]
    draft(draft4_faces, Plane(origin=(1.9500000000000004, 3.0500000000000007, 1.7000000000000002), x_dir=(1, 0, 0), z_dir=(0, 0, 1)), DRAFT4_ANGLE)

    # Fillet1
    fillet1_edges = [part.edges().sort_by_distance(p)[0] for p in [
        (-0.82500000000003, 4.812132034, 1.7),
        (-0.825, 2.350640109, 1.912963788),
        (-0.8249999999999991, 2.987867966, 1.7),
        (-0.8249999999999991, -0.125034203, 1.188010503),
        (1.6500000000000004, 0.15000000000000036, 0.3000000000000001),
        (-1.6500000000000004, 3.900000000000001, 1.400000000000002),
        (-1.6500000000000004, 0.15000000000000036, 0.3000000000000001),
        (1.6500000000000004, 3.900000000000001, 1.4000000000000108),
        (0.824999999999999, 2.9878679656439875, 1.7000000000000002),
        (0.824999999999999, 2.350640108760132, 1.9129637881718162),
        (0.824999999999999, -0.12503420259681308, 1.188010503084729),
        (0.8250000000000027, 4.812132034356001, 1.7000000000000002),
        (-2.2e-16, 5.200000000000001, 0),
        (1.6500000000000004, -3.2750000000000004, 1.4000000000000001),
        (1.1e-16, -5.200000000000001, 0),
        (-1.6500000000000004, -3.2750000000000004, 1.4000000000000001),
    ]]
    fillet(fillet1_edges, radius=FILLET1_R)

    # Fillet2
    fillet2_edges = [part.edges().sort_by_distance(p)[0] for p in [
        (-1.5, -0.922972275262529, 1.3486181996324813),
        (1.4999999999999991, -0.9229722752625503, 1.3486181996324),
    ]]
    fillet(fillet2_edges, radius=FILLET2_R)

    # Fillet3
    fillet3_edges = [part.edges().sort_by_distance(p)[0] for p in [
        (-0.8249999999999991, -0.122200542, 0.863305207),
        (-0.8249999999999991, 2.863603897, 1.4),
        (-0.825, 2.419687279, 2.268180686),
        (1.9500000000000002, 0.14999999999999947, 0),
        (-1.9500000000000002, 3.900000000000001, 1.7000000000000002),
        (-1.9500000000000002, 0.14999999999999858, 0),
        (0.824999999999999, 2.863603896931973, 1.4000000000000372),
        (0.824999999999999, -0.12220054240891351, 0.8633052072505193),
        (0.824999999999999, 2.4196872792485182, 2.268180686395647),
        (1.9500000000000002, 3.900000000000001, 1.7000000000000002),
        (0.8250000000000017, 4.936396103067781, 1.4000000000000001),
        (-0.8250000000000298, 4.936396103, 1.4),
        (0, 5.500000000000001, 0.30000000000000016),
        (1.9500000000000004, -3.2750000000000004, 1.7000000000000002),
        (0, -5.500000000000001, 0.3000000000000001),
        (-1.9500000000000004, -3.2750000000000004, 1.7000000000000002),
    ]]
    fillet(fillet3_edges, radius=FILLET3_R)

    # Fillet4: read off the stored shape, not the designer's step
    # Fillet4 outline → Fillet4 (add)
    with BuildSketch(Plane.XY):
        with BuildLine():
            Line((-0.75, -4.45), (-1.375, -4.45))
            ThreePointArc((-1.375, -4.45), (-0.933058262, -4.633058262), (-0.75, -5.075))
            Line((-0.75, -5.075), (-0.75, -4.45))
        make_face()
        with BuildLine():
            ThreePointArc((0.75, -5.075), (0.933058262, -4.633058262), (1.375, -4.45))
            Line((1.375, -4.45), (0.75, -4.45))
            Line((0.75, -4.45), (0.75, -5.075))
        make_face()
    extrude(amount=FILLET4_DEPTH)

    # Fillet4 2 outline → Fillet4 2 (cut)
    with BuildSketch(Plane(origin=(0, 0, 0), x_dir=(1, 0, 0), z_dir=(0, 0.707106781186714, -0.707106781186381)).offset(FILLET4_START)):
        with BuildLine():
            ThreePointArc((-0.875, -5.604772721), (-1.316941738, -5.421714459), (-1.5, -4.979772721))
            Line((-1.5, -4.979772721), (-1.5, -5.604772721))
            Line((-1.5, -5.604772721), (-0.875, -5.604772721))
        make_face()
        with BuildLine():
            ThreePointArc((1.5, -4.979772721), (1.316941738, -5.421714459), (0.875, -5.604772721))
            Line((0.875, -5.604772721), (1.5, -5.604772721))
            Line((1.5, -5.604772721), (1.5, -4.979772721))
        make_face()
    extrude(amount=FILLET4_2_DEPTH, mode=Mode.SUBTRACT)

    # Sketch25 → Cut-Extrude6 (cut)
    with BuildSketch(Plane(origin=(0, 4.750000000000001, 0), x_dir=(1, 0, 0), z_dir=(0, 1, 0))):
        Polygon((-2.150597413752126, 1.4408106156054146), (2.3120536760458297, 1.4408106156054146), (2.3120536760458292, -3.1035844529903045), (-2.150597413752126, -3.1035844529903045), align=None)
    extrude(amount=CUT_EXTRUDE6_DEPTH, mode=Mode.SUBTRACT)

    # Sketch26 → Cut-Extrude7 (cut)
    with BuildSketch(Plane(origin=(0, 0, 0), x_dir=(-1, 0, 0), z_dir=(0, 0, -1))):
        Polygon((-1.9500000000000004, 1.2500000000000002), (-0.9500000000000003, 1.2500000000000002), (-0.9500000000000002, 0.2500000000000002), (-1.9500000000000002, 0.2500000000000002), align=None)
        Polygon((1.9500000000000004, 1.2500000000000002), (0.9500000000000003, 1.2500000000000002), (0.9500000000000004, 0.25), (1.9500000000000004, 0.2500000000000002), align=None)
    extrude(amount=-CUT_EXTRUDE7_DEPTH, mode=Mode.SUBTRACT)

    # Sketch27 → Boss-Extrude20 (add)
    with BuildSketch(Plane(origin=(0, 0, 0.5), x_dir=(-1, 0, 0), z_dir=(0, 0, -1))):
        Polygon((1.6500000000000004, 0.25000000000000017), (1.9500000000000004, 0.2500000000000002), (1.9500000000000004, 1.2500000000000002), (1.6500000000000004, 1.2500000000000002), align=None)
        Polygon((-1.6500000000000004, 1.2500000000000002), (-1.9500000000000004, 1.2500000000000002), (-1.9500000000000002, 0.2500000000000002), (-1.6500000000000004, 0.2500000000000002), align=None)
    extrude(amount=BOSS_EXTRUDE20_DEPTH)


solid = part.part
